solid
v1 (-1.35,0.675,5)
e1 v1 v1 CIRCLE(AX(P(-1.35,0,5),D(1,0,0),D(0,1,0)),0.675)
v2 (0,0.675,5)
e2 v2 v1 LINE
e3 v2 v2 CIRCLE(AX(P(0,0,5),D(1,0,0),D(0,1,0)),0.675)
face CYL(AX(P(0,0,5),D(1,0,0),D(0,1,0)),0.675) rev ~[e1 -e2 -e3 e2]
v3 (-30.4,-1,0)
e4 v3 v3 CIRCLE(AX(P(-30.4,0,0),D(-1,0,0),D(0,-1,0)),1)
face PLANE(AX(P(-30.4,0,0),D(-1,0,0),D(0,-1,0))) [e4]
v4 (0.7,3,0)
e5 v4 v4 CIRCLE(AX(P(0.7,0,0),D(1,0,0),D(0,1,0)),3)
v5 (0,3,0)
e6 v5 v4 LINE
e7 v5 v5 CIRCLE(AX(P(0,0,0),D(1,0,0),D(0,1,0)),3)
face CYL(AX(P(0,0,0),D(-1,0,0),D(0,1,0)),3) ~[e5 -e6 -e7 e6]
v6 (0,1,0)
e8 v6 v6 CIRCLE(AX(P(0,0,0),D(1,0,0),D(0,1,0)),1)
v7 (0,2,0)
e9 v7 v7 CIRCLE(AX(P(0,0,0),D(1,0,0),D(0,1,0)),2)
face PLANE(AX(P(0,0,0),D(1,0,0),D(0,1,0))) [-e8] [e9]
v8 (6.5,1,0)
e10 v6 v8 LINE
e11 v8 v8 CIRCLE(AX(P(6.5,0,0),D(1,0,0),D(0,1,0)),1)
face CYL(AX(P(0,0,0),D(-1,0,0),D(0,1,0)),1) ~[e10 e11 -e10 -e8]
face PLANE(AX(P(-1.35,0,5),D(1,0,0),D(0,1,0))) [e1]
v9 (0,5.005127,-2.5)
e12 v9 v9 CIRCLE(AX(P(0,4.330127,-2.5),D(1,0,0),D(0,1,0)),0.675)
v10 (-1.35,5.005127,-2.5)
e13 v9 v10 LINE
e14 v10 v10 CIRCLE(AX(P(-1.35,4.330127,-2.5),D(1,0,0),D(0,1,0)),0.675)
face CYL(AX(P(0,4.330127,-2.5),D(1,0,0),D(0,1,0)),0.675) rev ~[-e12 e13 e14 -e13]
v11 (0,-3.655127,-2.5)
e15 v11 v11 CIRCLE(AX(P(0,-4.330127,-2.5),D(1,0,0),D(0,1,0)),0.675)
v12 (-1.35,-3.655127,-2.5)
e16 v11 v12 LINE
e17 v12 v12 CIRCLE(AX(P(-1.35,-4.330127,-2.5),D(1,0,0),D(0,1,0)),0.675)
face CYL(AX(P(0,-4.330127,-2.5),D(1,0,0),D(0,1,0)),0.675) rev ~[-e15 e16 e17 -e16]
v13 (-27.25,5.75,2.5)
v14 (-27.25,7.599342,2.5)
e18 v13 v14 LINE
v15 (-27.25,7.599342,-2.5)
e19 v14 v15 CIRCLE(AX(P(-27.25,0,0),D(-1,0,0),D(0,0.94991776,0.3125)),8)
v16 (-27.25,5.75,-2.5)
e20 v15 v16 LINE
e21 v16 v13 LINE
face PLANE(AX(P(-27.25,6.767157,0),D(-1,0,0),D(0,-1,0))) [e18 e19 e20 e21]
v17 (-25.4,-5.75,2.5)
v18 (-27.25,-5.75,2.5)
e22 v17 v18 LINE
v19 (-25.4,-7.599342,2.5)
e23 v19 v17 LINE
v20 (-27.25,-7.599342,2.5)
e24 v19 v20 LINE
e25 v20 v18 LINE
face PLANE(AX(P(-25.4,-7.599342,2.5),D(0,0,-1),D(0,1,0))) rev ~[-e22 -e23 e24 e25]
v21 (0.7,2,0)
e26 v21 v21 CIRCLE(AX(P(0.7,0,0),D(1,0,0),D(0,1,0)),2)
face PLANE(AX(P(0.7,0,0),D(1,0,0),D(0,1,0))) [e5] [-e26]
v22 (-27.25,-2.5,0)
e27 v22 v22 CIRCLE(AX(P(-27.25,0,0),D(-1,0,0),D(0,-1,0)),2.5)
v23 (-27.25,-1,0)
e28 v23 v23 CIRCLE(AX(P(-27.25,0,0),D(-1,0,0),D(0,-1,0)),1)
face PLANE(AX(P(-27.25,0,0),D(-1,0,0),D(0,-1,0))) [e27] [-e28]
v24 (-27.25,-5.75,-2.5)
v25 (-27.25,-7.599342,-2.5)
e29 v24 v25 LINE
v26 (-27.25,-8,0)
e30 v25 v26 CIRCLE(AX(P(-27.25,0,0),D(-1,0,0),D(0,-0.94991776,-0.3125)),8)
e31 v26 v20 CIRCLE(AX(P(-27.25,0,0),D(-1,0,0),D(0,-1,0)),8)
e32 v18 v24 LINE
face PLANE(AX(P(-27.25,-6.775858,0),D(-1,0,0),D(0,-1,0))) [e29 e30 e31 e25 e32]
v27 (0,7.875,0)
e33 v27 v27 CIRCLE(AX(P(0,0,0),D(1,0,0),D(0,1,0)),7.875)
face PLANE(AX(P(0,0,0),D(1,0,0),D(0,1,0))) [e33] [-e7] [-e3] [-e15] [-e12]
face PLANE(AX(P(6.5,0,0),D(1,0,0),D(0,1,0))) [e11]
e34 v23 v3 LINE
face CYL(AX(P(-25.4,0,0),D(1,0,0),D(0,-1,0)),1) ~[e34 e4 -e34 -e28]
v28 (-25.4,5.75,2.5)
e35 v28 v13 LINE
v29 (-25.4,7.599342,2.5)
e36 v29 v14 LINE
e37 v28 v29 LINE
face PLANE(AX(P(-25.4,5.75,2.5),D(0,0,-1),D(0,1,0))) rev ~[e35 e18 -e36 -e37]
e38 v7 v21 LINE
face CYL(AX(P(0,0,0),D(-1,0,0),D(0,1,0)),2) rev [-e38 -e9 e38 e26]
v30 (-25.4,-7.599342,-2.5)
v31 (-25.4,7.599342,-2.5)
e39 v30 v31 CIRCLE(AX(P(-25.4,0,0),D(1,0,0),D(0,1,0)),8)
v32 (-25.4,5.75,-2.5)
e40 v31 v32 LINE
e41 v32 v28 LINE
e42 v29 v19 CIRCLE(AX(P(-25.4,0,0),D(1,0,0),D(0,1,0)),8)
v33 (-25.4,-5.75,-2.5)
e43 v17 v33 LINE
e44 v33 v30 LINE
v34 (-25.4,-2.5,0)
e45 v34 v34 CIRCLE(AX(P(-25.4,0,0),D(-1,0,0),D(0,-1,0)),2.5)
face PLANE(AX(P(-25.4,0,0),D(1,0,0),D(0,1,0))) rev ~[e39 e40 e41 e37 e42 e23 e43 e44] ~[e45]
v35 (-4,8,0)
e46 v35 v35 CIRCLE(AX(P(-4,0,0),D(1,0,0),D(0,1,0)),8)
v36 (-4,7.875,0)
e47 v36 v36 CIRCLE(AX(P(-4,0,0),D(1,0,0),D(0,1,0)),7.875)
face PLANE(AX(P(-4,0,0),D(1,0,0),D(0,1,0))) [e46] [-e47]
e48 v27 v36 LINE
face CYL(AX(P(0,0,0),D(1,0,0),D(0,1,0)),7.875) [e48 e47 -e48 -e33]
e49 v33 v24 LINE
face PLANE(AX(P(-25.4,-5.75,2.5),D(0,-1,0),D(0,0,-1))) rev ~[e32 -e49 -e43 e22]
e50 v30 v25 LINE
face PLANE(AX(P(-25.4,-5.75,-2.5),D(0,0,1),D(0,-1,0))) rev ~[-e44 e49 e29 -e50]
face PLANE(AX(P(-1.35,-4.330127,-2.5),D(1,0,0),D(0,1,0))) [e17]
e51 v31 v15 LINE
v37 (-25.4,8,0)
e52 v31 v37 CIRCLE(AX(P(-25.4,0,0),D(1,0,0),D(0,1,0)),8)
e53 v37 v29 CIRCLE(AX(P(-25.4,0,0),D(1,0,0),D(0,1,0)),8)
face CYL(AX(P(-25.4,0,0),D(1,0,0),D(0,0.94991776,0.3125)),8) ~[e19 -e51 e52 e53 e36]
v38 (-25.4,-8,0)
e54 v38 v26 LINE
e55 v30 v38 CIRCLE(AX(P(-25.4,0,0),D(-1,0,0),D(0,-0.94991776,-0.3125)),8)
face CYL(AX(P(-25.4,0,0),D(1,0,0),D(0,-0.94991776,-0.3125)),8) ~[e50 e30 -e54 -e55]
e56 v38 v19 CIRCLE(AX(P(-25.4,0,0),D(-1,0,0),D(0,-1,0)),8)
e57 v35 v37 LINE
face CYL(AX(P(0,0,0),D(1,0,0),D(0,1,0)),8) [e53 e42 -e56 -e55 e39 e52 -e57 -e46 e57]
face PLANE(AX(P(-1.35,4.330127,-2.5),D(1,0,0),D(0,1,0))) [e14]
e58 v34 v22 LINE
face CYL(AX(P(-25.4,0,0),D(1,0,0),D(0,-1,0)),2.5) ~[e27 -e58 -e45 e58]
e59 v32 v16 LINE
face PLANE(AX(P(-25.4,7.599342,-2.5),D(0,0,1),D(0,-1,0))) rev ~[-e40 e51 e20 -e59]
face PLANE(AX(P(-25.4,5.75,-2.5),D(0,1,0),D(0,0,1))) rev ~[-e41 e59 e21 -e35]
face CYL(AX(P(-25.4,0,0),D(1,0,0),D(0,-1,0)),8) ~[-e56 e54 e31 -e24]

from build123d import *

# Parameters (mm, degrees)
F0_R     = 8
F0_R_2   = 7.875
F0_R_3   = 0.675
F0_R_4   = 3
F0_R_5   = 2
F0_R_6   = 1
F1_DEPTH = 25.4
F2_DEPTH = 6.5
F3_DEPTH = 0.7
F4_DEPTH = 1.35
F5_DEPTH = 4
F6_R     = 1
F7_DEPTH = 5
F6_R_2   = 2.5
F8_DEPTH = 1.85


# Not quite as in the source:
# - after a boolean that leaves OpenCascade's solid faulty, fix() repairs it


with BuildPart() as f1:
    # F0 (on Right) → F1 (new body)
    with BuildSketch(Plane.YZ):
        Circle(F0_R)
        Circle(F0_R_2, mode=Mode.SUBTRACT)
        Circle(F0_R_2)
        with Locations((-4.3301270189, -2.5)):
            Circle(F0_R_3, mode=Mode.SUBTRACT)
        with Locations((4.3301270189, -2.5)):
            Circle(F0_R_3, mode=Mode.SUBTRACT)
        Circle(F0_R_4, mode=Mode.SUBTRACT)
        with Locations((0, 5)):
            Circle(F0_R_3, mode=Mode.SUBTRACT)
        Circle(F0_R_4)
        Circle(F0_R_5, mode=Mode.SUBTRACT)
        Circle(F0_R_5)
        Circle(F0_R_6, mode=Mode.SUBTRACT)
        Circle(F0_R_6)
        with Locations((0, 5)):
            Circle(F0_R_3)
        with Locations((4.3301270189, -2.5)):
            Circle(F0_R_3)
        with Locations((-4.3301270189, -2.5)):
            Circle(F0_R_3)
    extrude(amount=-F1_DEPTH)

    # F0 (on Right) → F2 (join)
    with BuildSketch(Plane.YZ):
        Circle(F0_R_6)
    extrude(amount=F2_DEPTH)

    # F0 (on Right) → F3 (join)
    with BuildSketch(Plane.YZ):
        Circle(F0_R_4)
        Circle(F0_R_5, mode=Mode.SUBTRACT)
    extrude(amount=F3_DEPTH)

    # F0 (on Right) → F4 (cut)
    with BuildSketch(Plane.YZ):
        with Locations((0, 5)):
            Circle(F0_R_3)
        with Locations((4.3301270189, -2.5)):
            Circle(F0_R_3)
        with Locations((-4.3301270189, -2.5)):
            Circle(F0_R_3)
    extrude(amount=-F4_DEPTH, mode=Mode.SUBTRACT)

    # F0 (on Right) → F5 (cut)
    with BuildSketch(Plane.YZ):
        Circle(F0_R)
        Circle(F0_R_2, mode=Mode.SUBTRACT)
    extrude(amount=-F5_DEPTH, mode=Mode.SUBTRACT)

    # F6 (on face) → F7 (join)
    with BuildSketch(Plane(origin=(-25.4, 0, 0), x_dir=(0, -1, 0), z_dir=(-1, 0, 0))):
        Circle(F6_R)
    extrude(amount=F7_DEPTH)

    # F6 (on face) → F8 (join)
    with BuildSketch(Plane(origin=(-25.4, 0, 0), x_dir=(0, -1, 0), z_dir=(-1, 0, 0))):
        Circle(F6_R_2)
        Circle(F6_R, mode=Mode.SUBTRACT)
        with BuildLine():
            ThreePointArc((8, 0), (7.8992004853, 1.2659509046), (7.5993420768, 2.5))
            Line((7.5993420768, 2.5), (5.75, 2.5))
            Line((5.75, 2.5), (5.75, -2.5))
            Line((5.75, -2.5), (7.5993420768, -2.5))
            ThreePointArc((7.5993420768, -2.5), (7.8992004853, -1.2659509046), (8, 0))
        make_face()
        with BuildLine():
            Line((-5.75, 2.5), (-7.5993420768, 2.5))
            ThreePointArc((-7.5993420768, 2.5), (-8, 0), (-7.5993420768, -2.5))
            Line((-7.5993420768, -2.5), (-5.75, -2.5))
            Line((-5.75, -2.5), (-5.75, 2.5))
        make_face()
    extrude(amount=F8_DEPTH)

    add(f1.part.fix(), mode=Mode.REPLACE)


solid = f1.part
